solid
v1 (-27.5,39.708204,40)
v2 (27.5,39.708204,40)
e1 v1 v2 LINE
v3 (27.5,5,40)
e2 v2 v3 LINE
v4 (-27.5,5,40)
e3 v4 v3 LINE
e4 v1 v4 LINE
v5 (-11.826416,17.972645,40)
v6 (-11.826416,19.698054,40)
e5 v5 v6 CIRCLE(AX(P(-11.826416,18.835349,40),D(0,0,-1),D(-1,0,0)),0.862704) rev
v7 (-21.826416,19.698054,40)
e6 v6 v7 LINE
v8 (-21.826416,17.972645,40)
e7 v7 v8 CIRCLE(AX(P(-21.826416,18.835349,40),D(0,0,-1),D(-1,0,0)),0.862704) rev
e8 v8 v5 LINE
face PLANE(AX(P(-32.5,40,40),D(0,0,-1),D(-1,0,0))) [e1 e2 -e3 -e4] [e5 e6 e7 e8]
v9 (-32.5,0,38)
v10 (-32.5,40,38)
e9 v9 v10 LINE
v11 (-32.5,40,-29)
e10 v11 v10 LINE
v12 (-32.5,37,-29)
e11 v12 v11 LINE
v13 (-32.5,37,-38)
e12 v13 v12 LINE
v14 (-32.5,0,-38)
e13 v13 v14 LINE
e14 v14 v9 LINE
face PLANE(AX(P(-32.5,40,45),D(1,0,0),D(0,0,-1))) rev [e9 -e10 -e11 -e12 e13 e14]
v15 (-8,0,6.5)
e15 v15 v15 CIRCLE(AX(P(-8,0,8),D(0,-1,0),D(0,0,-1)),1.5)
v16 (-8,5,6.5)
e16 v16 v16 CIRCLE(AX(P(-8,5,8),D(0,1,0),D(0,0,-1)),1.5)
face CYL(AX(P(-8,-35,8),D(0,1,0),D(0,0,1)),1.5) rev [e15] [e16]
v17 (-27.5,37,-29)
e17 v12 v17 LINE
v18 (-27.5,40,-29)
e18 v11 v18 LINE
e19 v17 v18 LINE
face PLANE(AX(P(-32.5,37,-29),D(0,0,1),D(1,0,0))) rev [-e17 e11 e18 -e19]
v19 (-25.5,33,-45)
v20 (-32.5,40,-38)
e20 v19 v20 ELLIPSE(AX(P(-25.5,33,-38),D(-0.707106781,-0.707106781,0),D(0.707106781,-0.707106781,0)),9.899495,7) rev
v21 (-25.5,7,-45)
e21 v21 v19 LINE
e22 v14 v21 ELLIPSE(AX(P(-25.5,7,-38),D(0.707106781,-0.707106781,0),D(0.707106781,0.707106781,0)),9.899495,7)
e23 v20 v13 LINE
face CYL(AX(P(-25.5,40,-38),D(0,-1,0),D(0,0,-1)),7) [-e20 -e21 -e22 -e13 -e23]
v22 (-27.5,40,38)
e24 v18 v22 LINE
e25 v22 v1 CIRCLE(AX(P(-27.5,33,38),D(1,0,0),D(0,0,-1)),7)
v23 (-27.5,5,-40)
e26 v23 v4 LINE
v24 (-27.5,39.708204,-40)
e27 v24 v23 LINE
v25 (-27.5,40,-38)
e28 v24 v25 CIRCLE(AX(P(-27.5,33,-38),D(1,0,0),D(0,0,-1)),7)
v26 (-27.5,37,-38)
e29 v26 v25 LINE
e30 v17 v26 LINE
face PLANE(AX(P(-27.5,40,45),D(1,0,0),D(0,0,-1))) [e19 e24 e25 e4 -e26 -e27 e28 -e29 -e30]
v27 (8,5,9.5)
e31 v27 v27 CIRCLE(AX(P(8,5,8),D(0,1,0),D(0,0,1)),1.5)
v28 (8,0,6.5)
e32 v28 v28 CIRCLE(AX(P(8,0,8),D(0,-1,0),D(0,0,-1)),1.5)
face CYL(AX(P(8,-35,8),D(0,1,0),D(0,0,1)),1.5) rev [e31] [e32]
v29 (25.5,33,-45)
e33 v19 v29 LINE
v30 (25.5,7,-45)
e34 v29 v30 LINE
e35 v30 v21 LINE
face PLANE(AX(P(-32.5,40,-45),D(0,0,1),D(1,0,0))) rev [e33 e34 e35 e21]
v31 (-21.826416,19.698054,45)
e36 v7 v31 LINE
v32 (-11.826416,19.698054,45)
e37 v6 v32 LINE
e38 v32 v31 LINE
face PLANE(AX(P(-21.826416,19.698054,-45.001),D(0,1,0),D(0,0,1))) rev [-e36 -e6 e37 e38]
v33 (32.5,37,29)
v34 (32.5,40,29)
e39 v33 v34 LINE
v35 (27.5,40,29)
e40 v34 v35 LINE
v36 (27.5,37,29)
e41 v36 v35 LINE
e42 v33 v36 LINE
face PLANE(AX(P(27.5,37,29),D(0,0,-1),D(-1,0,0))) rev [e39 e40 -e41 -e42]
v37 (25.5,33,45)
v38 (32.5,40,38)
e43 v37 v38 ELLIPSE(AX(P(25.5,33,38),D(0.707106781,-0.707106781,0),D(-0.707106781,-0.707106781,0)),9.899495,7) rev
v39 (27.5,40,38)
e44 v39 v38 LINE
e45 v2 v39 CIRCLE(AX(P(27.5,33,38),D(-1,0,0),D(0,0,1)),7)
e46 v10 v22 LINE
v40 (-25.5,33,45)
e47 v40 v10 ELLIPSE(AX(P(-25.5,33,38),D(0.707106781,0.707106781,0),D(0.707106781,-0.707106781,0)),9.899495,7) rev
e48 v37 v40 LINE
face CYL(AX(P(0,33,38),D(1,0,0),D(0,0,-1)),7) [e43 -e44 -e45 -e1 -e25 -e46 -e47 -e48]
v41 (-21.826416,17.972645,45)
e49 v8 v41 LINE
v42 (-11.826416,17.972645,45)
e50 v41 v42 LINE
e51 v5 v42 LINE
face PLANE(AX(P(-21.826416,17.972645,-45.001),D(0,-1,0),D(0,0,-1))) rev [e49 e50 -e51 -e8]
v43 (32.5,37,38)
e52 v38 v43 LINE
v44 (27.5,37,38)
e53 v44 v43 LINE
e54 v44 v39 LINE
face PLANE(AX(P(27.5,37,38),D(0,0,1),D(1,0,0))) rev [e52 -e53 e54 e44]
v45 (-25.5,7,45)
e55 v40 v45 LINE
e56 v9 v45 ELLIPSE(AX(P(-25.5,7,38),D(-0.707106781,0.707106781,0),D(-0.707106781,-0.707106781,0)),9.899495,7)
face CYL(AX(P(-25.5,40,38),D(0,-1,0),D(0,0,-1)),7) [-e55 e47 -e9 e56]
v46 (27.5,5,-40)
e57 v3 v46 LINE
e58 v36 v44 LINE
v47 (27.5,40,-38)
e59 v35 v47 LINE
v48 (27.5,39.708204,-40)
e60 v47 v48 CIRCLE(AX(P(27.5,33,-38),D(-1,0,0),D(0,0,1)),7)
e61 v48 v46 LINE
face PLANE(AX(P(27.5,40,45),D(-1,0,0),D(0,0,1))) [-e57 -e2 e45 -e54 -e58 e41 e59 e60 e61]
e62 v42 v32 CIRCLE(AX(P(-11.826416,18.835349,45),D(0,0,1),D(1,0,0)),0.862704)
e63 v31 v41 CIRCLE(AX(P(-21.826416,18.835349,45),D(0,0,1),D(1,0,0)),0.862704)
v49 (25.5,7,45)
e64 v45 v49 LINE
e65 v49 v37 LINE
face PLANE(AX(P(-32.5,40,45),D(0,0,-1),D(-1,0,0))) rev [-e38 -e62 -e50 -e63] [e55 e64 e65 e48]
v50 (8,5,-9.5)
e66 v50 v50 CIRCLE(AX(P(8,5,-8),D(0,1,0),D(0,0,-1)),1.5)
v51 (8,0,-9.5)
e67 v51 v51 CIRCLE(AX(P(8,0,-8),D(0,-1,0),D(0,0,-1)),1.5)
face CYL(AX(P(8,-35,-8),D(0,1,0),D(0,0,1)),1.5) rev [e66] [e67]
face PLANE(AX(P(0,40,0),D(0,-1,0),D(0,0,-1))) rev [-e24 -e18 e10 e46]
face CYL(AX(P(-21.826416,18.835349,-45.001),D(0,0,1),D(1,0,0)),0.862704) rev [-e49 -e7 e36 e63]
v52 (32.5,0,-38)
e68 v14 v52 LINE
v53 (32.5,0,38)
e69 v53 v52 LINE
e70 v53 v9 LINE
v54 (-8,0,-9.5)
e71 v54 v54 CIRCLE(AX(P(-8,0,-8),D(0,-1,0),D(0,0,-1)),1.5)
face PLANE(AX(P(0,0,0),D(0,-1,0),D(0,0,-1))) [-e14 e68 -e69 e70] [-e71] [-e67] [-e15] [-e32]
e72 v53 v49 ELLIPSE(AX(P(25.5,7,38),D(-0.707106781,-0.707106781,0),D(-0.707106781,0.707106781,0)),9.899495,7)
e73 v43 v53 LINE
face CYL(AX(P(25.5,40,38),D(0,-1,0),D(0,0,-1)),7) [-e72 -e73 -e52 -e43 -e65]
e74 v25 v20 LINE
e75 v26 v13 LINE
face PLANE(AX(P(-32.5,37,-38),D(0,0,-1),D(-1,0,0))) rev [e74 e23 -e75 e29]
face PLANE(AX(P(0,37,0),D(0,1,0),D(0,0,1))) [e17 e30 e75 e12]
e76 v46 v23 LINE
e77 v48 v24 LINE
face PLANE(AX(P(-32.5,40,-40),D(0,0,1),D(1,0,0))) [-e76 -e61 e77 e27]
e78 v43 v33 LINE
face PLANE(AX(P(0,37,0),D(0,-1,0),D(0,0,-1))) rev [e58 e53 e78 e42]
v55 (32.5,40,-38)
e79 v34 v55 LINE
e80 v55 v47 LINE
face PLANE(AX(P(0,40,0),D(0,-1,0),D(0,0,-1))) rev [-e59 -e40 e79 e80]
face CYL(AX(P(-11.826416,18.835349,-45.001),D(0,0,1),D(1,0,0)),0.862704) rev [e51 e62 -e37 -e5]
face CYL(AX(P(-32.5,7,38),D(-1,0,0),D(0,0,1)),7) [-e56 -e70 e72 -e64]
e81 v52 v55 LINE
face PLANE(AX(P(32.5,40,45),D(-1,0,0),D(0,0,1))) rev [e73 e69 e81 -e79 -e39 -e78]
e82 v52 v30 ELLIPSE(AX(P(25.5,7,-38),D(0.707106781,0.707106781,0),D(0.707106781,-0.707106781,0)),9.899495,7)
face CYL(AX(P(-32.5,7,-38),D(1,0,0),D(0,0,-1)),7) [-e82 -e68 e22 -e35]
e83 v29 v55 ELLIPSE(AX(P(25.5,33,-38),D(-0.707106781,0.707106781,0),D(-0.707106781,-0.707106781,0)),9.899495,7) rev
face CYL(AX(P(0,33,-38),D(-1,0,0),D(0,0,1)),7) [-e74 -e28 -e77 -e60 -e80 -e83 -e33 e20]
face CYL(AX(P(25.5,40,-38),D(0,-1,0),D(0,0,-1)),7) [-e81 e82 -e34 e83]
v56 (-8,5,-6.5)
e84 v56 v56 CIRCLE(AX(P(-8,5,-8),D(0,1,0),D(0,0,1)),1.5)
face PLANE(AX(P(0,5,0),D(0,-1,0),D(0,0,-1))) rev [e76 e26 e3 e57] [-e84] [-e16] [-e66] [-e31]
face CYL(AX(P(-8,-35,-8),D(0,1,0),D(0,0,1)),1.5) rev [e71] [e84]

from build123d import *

# Parameters (mm, degrees)
ESBO_O3_W                = 65
ESBO_O3_H                = 90
RESSALTO_EXTRUS_O2_DEPTH = 40
CASCA2_T                 = -5
ESBO_O4_R                = 1.5
CORTE_EXTRUS_O1_DEPTH    = 40
FILETE2_R                = 7
ESBO_O5_W                = 5
ESBO_O5_H                = 9
CORTE_EXTRUS_O2_DEPTH    = 3
ESBO_O7_W                = 5
ESBO_O7_H                = 9
CORTE_EXTRUS_O3_DEPTH    = 3
CORTE_EXTRUS_O4_REACH    = 105.712


with BuildPart() as part:
    # Esboço3 → Ressalto-extrusão2 (new body)
    with BuildSketch(Plane(origin=(0, 0, 0), x_dir=(1, 0, 0), z_dir=(0, 1, 0))):
        Rectangle(ESBO_O3_W, ESBO_O3_H)
    extrude(amount=RESSALTO_EXTRUS_O2_DEPTH)

    # Casca2
    casca2_openings = [part.faces().sort_by_distance(p)[0] for p in [
        (0, 40, 0),
    ]]
    offset(amount=CASCA2_T, openings=casca2_openings, kind=Kind.INTERSECTION)

    # Esboço4 → Corte-extrusão1 (cut)
    with BuildSketch(Plane(origin=(0, 5, 0), x_dir=(1, 0, 0), z_dir=(0, 1, 0))):
        with Locations(Location((-8, 8, 0), (0, 0, 270))):
            Circle(ESBO_O4_R)
        with Locations(Location((8, 8, 0), (0, 0, 90))):
            Circle(ESBO_O4_R)
        with Locations(Location((8, -8, 0), (0, 0, 270))):
            Circle(ESBO_O4_R)
        with Locations(Location((-8, -8, 0), (0, 0, 90))):
            Circle(ESBO_O4_R)
    extrude(amount=-CORTE_EXTRUS_O1_DEPTH, mode=Mode.SUBTRACT)

    # Filete2
    # the kernel refuses this fillet: 7 mm, written as the material it takes off along each edge
    with BuildSketch(Plane(origin=(32.5, -17.5, -45), x_dir=(0, 0, 1), z_dir=(0, 1, 0)), Plane(origin=(32.5, -17.5, 45), x_dir=(-1, 0, 0), z_dir=(0, 1, 0))) as filete2_piece_1:
        with BuildLine():
            CenterArc((FILETE2_R, -FILETE2_R), FILETE2_R, 90, 90)
            Line((0, -FILETE2_R), (0, 0))
            Line((0, 0), (FILETE2_R, 0))
        make_face()
    extrude(amount=75, mode=Mode.SUBTRACT)
    with BuildSketch(Plane(origin=(50, 40, -45), x_dir=(0, 0, 1), z_dir=(-1, 0, 0)), Plane(origin=(-50, 0, 45), x_dir=(0, 1, 0), z_dir=(1, 0, 0))) as filete2_piece_2:
        with BuildLine():
            CenterArc((FILETE2_R, -FILETE2_R), FILETE2_R, 90, 90)
            Line((0, -FILETE2_R), (0, 0))
            Line((0, 0), (FILETE2_R, 0))
        make_face()
    extrude(amount=100, mode=Mode.SUBTRACT)
    with BuildSketch(Plane(origin=(-32.5, -17.5, -45), x_dir=(0, 0, 1), z_dir=(0, 1, 0)), Plane(origin=(-32.5, -17.5, 45), x_dir=(1, 0, 0), z_dir=(0, 1, 0))) as filete2_piece_3:
        with BuildLine():
            CenterArc((FILETE2_R, FILETE2_R), FILETE2_R, 180, 90)
            Line((0, FILETE2_R), (0, 0))
            Line((0, 0), (FILETE2_R, 0))
        make_face()
    extrude(amount=75, mode=Mode.SUBTRACT)
    with BuildSketch(Plane(origin=(50, 0, -45), x_dir=(0, 0, 1), z_dir=(-1, 0, 0)), Plane(origin=(-50, 40, 45), x_dir=(0, -1, 0), z_dir=(1, 0, 0))) as filete2_piece_4:
        with BuildLine():
            CenterArc((FILETE2_R, FILETE2_R), FILETE2_R, 180, 90)
            Line((0, FILETE2_R), (0, 0))
            Line((0, 0), (FILETE2_R, 0))
        make_face()
    extrude(amount=100, mode=Mode.SUBTRACT)

    # Esboço5 → Corte-extrusão2 (cut)
    with BuildSketch(Plane(origin=(0, 40, 0), x_dir=(1, 0, 0), z_dir=(0, 1, 0))):
        with Locations((-30, 33.5)):
            Rectangle(ESBO_O5_W, ESBO_O5_H)
    extrude(amount=-CORTE_EXTRUS_O2_DEPTH, mode=Mode.SUBTRACT)

    # Esboço7 → Corte-extrusão3 (cut)
    with BuildSketch(Plane(origin=(0, 40, 0), x_dir=(1, 0, 0), z_dir=(0, 1, 0))):
        with Locations((30, -33.5)):
            Rectangle(ESBO_O7_W, ESBO_O7_H)
    extrude(amount=-CORTE_EXTRUS_O3_DEPTH, mode=Mode.SUBTRACT)

    # Esboço8 → Corte-extrusão4 (cut, up to next)
    with BuildSketch(Plane.XY.offset(45), mode=Mode.PRIVATE) as corte_extrus_o4_sk1:
        with BuildLine():
            Line((-21.8264162, 19.698053531), (-11.8264162, 19.698053531))
            ThreePointArc((-11.8264162, 19.698053531), (-10.963712002, 18.835349333), (-11.8264162, 17.972645136))
            Line((-11.8264162, 17.972645136), (-21.8264162, 17.972645136))
            ThreePointArc((-21.8264162, 17.972645136), (-22.689120398, 18.835349333), (-21.8264162, 19.698053531))
        make_face()
    corte_extrus_o4_tool1 = extrude(corte_extrus_o4_sk1.sketch, amount=-CORTE_EXTRUS_O4_REACH, mode=Mode.PRIVATE) & part.part
    add(corte_extrus_o4_tool1.solids().sort_by_distance((-16.826416, 18.835349, 45))[0], mode=Mode.SUBTRACT)


solid = part.part
